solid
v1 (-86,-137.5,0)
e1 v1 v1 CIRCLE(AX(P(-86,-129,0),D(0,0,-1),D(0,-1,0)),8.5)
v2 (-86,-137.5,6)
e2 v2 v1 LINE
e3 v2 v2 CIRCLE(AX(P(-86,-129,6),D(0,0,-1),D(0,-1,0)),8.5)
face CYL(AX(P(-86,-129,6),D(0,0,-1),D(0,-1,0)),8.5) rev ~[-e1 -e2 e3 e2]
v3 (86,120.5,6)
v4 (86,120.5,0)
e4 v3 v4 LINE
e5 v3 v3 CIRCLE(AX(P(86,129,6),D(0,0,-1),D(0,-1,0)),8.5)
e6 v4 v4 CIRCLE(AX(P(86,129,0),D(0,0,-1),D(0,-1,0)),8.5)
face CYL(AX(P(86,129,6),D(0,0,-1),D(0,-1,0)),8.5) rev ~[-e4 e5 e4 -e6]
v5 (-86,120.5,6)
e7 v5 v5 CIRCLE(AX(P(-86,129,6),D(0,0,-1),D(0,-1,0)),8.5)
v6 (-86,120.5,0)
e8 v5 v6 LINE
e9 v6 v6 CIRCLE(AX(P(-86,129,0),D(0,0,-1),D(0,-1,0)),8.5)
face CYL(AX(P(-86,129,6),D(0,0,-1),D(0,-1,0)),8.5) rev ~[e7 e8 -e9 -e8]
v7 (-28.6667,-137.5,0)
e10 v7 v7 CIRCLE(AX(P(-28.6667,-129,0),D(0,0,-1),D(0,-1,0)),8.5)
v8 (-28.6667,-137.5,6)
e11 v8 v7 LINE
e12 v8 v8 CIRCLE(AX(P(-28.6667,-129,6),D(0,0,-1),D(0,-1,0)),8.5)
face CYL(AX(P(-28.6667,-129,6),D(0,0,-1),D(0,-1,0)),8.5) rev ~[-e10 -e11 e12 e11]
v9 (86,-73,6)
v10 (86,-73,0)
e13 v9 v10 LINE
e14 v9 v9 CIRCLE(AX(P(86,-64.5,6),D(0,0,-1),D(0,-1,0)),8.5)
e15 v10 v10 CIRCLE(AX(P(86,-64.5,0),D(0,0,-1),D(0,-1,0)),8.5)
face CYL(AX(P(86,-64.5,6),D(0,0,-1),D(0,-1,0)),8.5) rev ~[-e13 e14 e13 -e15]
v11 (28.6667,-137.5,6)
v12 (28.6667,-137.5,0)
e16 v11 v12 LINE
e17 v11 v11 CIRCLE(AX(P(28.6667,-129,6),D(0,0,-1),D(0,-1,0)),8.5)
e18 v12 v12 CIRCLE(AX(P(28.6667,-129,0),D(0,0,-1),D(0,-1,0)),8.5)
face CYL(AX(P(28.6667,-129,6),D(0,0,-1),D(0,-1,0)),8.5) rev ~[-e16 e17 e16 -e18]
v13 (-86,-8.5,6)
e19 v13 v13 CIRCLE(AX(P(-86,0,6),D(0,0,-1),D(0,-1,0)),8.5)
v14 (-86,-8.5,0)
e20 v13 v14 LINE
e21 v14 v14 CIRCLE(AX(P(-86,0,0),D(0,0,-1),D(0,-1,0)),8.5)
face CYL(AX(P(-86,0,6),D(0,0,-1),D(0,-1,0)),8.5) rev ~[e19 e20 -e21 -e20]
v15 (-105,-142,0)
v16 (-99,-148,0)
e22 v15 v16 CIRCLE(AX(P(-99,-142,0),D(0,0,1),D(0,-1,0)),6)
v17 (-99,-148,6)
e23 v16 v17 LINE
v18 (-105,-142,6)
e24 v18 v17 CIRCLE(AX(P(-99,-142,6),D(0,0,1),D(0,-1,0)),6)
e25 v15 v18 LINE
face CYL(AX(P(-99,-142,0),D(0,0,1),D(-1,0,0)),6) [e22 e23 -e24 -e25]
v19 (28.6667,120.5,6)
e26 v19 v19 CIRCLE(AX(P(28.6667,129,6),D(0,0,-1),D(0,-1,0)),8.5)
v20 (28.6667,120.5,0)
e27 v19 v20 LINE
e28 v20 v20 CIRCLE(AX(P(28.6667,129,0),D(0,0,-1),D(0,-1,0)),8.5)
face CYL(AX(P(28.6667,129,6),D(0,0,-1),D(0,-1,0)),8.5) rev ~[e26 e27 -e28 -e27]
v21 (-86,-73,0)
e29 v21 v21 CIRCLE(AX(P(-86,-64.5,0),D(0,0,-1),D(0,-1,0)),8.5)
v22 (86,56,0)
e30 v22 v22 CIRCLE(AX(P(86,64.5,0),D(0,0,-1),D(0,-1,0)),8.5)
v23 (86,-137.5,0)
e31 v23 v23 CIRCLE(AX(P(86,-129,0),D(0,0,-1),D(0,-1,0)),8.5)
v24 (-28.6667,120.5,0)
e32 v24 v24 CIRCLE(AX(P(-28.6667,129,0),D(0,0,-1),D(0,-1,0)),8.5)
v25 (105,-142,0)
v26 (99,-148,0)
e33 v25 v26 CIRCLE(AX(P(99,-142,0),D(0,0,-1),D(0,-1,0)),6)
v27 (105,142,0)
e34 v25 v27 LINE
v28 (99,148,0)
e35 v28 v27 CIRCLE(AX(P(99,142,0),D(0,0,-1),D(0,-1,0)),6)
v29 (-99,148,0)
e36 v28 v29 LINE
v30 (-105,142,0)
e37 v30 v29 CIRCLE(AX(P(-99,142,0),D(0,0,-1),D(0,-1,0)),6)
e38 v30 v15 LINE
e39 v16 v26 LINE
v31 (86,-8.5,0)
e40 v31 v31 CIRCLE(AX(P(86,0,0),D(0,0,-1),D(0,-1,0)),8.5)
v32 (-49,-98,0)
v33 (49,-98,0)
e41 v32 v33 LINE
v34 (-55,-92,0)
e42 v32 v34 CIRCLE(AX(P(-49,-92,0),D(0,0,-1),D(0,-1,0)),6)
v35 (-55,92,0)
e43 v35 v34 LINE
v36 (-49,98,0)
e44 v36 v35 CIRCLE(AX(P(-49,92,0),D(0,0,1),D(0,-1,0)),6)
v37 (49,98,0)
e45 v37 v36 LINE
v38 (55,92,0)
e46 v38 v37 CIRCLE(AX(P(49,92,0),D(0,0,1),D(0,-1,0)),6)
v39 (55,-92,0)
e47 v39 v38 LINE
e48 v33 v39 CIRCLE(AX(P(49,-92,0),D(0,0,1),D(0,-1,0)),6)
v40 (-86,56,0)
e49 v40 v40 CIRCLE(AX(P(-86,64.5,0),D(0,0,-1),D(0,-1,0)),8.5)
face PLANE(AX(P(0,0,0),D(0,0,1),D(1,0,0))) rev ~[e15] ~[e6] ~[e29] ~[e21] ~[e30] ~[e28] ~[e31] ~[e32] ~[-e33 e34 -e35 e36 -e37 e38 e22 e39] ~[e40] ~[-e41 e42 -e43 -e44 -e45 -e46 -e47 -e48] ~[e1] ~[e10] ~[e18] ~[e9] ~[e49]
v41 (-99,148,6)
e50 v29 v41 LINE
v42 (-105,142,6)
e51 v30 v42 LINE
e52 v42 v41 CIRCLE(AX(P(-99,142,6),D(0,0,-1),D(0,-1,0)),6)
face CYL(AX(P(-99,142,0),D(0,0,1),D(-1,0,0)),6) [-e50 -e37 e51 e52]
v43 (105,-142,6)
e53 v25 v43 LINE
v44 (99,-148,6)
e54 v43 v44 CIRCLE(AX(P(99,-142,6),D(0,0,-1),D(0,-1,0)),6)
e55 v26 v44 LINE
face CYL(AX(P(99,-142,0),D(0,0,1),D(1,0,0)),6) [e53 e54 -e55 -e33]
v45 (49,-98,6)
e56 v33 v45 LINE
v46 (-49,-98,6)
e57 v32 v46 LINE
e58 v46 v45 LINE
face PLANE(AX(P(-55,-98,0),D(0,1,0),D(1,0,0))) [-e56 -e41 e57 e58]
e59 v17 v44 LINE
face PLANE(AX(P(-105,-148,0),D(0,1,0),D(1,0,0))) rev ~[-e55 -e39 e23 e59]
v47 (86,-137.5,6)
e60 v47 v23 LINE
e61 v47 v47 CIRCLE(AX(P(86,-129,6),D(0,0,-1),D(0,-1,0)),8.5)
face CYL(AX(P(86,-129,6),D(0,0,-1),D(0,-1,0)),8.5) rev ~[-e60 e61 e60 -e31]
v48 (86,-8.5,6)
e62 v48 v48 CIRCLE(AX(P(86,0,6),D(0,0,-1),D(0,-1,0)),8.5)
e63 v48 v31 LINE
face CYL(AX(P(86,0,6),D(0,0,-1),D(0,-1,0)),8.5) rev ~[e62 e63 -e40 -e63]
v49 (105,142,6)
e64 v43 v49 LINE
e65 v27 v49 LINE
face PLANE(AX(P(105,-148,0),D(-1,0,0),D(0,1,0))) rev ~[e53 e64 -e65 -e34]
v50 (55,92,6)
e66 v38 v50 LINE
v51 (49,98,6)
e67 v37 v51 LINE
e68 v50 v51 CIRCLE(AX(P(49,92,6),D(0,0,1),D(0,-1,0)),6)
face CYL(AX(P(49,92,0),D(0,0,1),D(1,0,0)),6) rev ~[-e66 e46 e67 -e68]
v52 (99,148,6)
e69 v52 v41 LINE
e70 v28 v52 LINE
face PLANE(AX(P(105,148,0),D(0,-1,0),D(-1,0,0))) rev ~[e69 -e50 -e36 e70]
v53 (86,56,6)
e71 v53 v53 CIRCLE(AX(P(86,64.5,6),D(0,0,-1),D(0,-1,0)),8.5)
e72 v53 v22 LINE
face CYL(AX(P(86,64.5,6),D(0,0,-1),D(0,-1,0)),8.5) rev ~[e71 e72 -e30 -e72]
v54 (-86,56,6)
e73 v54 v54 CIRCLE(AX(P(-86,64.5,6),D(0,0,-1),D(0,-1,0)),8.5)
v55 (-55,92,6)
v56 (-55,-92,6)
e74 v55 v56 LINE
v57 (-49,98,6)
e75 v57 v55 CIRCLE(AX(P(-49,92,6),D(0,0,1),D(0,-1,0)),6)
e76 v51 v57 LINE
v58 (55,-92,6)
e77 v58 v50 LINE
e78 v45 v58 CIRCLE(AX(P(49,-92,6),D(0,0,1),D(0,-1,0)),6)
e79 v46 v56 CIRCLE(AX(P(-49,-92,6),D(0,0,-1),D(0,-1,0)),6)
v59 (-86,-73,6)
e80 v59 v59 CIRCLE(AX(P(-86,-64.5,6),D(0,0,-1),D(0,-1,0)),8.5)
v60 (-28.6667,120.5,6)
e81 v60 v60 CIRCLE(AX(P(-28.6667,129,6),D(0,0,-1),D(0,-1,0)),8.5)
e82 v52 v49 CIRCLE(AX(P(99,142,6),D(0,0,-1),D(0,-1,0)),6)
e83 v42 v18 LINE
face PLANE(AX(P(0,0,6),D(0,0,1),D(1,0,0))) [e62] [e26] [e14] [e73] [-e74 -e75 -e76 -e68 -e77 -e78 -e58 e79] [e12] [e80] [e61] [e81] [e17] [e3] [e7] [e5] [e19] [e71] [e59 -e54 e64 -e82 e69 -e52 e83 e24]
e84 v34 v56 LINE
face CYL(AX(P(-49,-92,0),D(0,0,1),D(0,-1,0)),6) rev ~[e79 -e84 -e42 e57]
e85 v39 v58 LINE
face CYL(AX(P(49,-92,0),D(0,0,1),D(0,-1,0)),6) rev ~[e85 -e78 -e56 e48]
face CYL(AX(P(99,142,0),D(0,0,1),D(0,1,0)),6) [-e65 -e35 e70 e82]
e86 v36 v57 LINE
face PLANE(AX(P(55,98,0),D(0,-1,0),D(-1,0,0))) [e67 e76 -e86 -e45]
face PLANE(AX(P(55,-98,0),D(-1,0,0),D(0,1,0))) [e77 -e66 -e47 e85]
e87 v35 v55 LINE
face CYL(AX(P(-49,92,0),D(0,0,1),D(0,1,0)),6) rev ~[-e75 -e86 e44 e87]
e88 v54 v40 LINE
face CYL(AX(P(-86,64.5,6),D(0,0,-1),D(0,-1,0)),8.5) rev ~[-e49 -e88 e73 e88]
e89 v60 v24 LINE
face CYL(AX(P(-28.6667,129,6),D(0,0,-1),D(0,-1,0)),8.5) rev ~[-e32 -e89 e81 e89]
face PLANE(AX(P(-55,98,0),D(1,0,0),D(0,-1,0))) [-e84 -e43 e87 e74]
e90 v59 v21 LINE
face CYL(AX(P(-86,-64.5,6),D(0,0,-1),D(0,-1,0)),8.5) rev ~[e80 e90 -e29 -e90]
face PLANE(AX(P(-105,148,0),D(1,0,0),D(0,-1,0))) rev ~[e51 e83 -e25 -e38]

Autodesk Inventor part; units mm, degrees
ref_plane "YZ Plane" through (0, 0, 0) normal (1, 0, 0) x (0, 1, 0)
ref_plane "XZ Plane" through (0, 0, 0) normal (0, 1, 0) x (-1, 0, 0)
ref_plane "XY Plane" through (0, 0, 0) normal (0, 0, 1) x (1, 0, 0)
sketch "Sketch2" plane through (0, 0, 0) normal (0, 0, 1) x (1, 0, 0)
  line L0 (-55, -98) -> (55, -98)
  line L1 (55, -98) -> (55, 98)
  line L2 (55, 98) -> (-55, 98)
  line L3 (-55, 98) -> (-55, -98)
  line L4 (-55, -98) -> (55, 98) construction
  line L5 (55, -98) -> (-55, 98) construction
  line L6 (-105, -148) -> (105, -148)
  line L7 (105, -148) -> (105, 148)
  line L8 (105, 148) -> (-105, 148)
  line L9 (-105, 148) -> (-105, -148)
  point P0 (0, 0)
  dimension "d29" = 110
  dimension "d30" = 196
  dimension "d31" = 50
extrude "Plate2" add sketch "Sketch2" along normal blind 6
sketch "Sketch5" plane through (0, 0, 6) normal (0, 0, 1) x (1, 0, 0)
  line L0 (55, 98) -> (55, -98) construction
  line L1 (55, -98) -> (-55, -98) construction
  line L2 (-55, -98) -> (-55, 98) construction
  line L3 (-55, 98) -> (55, 98) construction
  line L4 (105, -148) -> (-105, -148) construction
  line L5 (105, 148) -> (105, -148) construction
  line L6 (-105, 148) -> (105, 148) construction
  line L7 (-105, -148) -> (-105, 148) construction
  line L8 (-86, 129) -> (86, 129) construction
  line L9 (86, 129) -> (86, -129) construction
  line L10 (86, -129) -> (-86, -129) construction
  line L11 (-86, -129) -> (-86, 129) construction
  line L12 (-55, 0) -> (55, 0) construction
  line L13 (0, 98) -> (0, -98)
  point P0 (0, 0)
  point P1 (0, -129)
  point P2 (-86, 64.5)
  point P3 (-86, 0)
  point P4 (-86, -64.5)
  point P5 (-28.6667, -129)
  point P6 (28.6667, -129)
  point P7 (86, -64.5)
  point P8 (86, 0)
  point P9 (86, 64.5)
  point P10 (28.6667, 129)
  point P11 (-28.6667, 129)
  dimension "d34" = 19
  dimension "d49" = 64.5
  dimension "d50" = 64.5
  dimension "d51" = 57.3333
  dimension "d52" = 57.3333
  dimension "d53" = 57.3333
fillet "Corner Round1" radius 6 8 edges at (-105, -148, 3) (-105, 148, 3) (105, 148, 3) (105, -148, 3) (55, -98, 3) (-55, -98, 3) (-55, 98, 3) (55, 98, 3)
hole "Hole1" at (-86, 129, 6) at (-86, 64.5, 6) at (-86, 0, 6) at (-86, -64.5, 6) at (-86, -129, 6) at (-28.6667, -129, 6) at (28.6667, -129, 6) at (86, -129, 6) at (86, -64.5, 6) at (86, 0, 6) at (86, 64.5, 6) at (86, 129, 6) at (28.6667, 129, 6) at (-28.6667, 129, 6) direction (0, 0, -1) diameter 17 end through all
equation "\"d49\" = d50"
equation "\"d51\" = d53"
equation "\"d52\" = d53"
equation "\"d29\" = ChargingHatch_hight - 2 * Thickness"
equation "\"d30\" = ChargingHatch_width - 2 * Thickness"
equation "\"d59\" = Thickness"
equation "\"d14\" = Thickness"
equation "\"BendReliefWidth\" = Thickness"
equation "\"BendReliefDepth\" = 0.5 * Thickness"
equation "\"CornerReliefSize\" = 4 * Thickness"
equation "\"MinimumRemnant\" = 2 * Thickness"
equation "\"TransitionRadius\" = BendRadius"
equation "\"JacobiRadiusSize\" = BendRadius"
equation "\"GapSize\" = Thickness"
equation "\"ChargingHatch_hight\" = 122"
equation "\"Thickness\" = 6"
equation "\"ChargingHatch_width\" = 208"
equation "\"BendRadius\" = 6"
properties part number "PRS 9606 charging flange round_D1200" material "Steel"
